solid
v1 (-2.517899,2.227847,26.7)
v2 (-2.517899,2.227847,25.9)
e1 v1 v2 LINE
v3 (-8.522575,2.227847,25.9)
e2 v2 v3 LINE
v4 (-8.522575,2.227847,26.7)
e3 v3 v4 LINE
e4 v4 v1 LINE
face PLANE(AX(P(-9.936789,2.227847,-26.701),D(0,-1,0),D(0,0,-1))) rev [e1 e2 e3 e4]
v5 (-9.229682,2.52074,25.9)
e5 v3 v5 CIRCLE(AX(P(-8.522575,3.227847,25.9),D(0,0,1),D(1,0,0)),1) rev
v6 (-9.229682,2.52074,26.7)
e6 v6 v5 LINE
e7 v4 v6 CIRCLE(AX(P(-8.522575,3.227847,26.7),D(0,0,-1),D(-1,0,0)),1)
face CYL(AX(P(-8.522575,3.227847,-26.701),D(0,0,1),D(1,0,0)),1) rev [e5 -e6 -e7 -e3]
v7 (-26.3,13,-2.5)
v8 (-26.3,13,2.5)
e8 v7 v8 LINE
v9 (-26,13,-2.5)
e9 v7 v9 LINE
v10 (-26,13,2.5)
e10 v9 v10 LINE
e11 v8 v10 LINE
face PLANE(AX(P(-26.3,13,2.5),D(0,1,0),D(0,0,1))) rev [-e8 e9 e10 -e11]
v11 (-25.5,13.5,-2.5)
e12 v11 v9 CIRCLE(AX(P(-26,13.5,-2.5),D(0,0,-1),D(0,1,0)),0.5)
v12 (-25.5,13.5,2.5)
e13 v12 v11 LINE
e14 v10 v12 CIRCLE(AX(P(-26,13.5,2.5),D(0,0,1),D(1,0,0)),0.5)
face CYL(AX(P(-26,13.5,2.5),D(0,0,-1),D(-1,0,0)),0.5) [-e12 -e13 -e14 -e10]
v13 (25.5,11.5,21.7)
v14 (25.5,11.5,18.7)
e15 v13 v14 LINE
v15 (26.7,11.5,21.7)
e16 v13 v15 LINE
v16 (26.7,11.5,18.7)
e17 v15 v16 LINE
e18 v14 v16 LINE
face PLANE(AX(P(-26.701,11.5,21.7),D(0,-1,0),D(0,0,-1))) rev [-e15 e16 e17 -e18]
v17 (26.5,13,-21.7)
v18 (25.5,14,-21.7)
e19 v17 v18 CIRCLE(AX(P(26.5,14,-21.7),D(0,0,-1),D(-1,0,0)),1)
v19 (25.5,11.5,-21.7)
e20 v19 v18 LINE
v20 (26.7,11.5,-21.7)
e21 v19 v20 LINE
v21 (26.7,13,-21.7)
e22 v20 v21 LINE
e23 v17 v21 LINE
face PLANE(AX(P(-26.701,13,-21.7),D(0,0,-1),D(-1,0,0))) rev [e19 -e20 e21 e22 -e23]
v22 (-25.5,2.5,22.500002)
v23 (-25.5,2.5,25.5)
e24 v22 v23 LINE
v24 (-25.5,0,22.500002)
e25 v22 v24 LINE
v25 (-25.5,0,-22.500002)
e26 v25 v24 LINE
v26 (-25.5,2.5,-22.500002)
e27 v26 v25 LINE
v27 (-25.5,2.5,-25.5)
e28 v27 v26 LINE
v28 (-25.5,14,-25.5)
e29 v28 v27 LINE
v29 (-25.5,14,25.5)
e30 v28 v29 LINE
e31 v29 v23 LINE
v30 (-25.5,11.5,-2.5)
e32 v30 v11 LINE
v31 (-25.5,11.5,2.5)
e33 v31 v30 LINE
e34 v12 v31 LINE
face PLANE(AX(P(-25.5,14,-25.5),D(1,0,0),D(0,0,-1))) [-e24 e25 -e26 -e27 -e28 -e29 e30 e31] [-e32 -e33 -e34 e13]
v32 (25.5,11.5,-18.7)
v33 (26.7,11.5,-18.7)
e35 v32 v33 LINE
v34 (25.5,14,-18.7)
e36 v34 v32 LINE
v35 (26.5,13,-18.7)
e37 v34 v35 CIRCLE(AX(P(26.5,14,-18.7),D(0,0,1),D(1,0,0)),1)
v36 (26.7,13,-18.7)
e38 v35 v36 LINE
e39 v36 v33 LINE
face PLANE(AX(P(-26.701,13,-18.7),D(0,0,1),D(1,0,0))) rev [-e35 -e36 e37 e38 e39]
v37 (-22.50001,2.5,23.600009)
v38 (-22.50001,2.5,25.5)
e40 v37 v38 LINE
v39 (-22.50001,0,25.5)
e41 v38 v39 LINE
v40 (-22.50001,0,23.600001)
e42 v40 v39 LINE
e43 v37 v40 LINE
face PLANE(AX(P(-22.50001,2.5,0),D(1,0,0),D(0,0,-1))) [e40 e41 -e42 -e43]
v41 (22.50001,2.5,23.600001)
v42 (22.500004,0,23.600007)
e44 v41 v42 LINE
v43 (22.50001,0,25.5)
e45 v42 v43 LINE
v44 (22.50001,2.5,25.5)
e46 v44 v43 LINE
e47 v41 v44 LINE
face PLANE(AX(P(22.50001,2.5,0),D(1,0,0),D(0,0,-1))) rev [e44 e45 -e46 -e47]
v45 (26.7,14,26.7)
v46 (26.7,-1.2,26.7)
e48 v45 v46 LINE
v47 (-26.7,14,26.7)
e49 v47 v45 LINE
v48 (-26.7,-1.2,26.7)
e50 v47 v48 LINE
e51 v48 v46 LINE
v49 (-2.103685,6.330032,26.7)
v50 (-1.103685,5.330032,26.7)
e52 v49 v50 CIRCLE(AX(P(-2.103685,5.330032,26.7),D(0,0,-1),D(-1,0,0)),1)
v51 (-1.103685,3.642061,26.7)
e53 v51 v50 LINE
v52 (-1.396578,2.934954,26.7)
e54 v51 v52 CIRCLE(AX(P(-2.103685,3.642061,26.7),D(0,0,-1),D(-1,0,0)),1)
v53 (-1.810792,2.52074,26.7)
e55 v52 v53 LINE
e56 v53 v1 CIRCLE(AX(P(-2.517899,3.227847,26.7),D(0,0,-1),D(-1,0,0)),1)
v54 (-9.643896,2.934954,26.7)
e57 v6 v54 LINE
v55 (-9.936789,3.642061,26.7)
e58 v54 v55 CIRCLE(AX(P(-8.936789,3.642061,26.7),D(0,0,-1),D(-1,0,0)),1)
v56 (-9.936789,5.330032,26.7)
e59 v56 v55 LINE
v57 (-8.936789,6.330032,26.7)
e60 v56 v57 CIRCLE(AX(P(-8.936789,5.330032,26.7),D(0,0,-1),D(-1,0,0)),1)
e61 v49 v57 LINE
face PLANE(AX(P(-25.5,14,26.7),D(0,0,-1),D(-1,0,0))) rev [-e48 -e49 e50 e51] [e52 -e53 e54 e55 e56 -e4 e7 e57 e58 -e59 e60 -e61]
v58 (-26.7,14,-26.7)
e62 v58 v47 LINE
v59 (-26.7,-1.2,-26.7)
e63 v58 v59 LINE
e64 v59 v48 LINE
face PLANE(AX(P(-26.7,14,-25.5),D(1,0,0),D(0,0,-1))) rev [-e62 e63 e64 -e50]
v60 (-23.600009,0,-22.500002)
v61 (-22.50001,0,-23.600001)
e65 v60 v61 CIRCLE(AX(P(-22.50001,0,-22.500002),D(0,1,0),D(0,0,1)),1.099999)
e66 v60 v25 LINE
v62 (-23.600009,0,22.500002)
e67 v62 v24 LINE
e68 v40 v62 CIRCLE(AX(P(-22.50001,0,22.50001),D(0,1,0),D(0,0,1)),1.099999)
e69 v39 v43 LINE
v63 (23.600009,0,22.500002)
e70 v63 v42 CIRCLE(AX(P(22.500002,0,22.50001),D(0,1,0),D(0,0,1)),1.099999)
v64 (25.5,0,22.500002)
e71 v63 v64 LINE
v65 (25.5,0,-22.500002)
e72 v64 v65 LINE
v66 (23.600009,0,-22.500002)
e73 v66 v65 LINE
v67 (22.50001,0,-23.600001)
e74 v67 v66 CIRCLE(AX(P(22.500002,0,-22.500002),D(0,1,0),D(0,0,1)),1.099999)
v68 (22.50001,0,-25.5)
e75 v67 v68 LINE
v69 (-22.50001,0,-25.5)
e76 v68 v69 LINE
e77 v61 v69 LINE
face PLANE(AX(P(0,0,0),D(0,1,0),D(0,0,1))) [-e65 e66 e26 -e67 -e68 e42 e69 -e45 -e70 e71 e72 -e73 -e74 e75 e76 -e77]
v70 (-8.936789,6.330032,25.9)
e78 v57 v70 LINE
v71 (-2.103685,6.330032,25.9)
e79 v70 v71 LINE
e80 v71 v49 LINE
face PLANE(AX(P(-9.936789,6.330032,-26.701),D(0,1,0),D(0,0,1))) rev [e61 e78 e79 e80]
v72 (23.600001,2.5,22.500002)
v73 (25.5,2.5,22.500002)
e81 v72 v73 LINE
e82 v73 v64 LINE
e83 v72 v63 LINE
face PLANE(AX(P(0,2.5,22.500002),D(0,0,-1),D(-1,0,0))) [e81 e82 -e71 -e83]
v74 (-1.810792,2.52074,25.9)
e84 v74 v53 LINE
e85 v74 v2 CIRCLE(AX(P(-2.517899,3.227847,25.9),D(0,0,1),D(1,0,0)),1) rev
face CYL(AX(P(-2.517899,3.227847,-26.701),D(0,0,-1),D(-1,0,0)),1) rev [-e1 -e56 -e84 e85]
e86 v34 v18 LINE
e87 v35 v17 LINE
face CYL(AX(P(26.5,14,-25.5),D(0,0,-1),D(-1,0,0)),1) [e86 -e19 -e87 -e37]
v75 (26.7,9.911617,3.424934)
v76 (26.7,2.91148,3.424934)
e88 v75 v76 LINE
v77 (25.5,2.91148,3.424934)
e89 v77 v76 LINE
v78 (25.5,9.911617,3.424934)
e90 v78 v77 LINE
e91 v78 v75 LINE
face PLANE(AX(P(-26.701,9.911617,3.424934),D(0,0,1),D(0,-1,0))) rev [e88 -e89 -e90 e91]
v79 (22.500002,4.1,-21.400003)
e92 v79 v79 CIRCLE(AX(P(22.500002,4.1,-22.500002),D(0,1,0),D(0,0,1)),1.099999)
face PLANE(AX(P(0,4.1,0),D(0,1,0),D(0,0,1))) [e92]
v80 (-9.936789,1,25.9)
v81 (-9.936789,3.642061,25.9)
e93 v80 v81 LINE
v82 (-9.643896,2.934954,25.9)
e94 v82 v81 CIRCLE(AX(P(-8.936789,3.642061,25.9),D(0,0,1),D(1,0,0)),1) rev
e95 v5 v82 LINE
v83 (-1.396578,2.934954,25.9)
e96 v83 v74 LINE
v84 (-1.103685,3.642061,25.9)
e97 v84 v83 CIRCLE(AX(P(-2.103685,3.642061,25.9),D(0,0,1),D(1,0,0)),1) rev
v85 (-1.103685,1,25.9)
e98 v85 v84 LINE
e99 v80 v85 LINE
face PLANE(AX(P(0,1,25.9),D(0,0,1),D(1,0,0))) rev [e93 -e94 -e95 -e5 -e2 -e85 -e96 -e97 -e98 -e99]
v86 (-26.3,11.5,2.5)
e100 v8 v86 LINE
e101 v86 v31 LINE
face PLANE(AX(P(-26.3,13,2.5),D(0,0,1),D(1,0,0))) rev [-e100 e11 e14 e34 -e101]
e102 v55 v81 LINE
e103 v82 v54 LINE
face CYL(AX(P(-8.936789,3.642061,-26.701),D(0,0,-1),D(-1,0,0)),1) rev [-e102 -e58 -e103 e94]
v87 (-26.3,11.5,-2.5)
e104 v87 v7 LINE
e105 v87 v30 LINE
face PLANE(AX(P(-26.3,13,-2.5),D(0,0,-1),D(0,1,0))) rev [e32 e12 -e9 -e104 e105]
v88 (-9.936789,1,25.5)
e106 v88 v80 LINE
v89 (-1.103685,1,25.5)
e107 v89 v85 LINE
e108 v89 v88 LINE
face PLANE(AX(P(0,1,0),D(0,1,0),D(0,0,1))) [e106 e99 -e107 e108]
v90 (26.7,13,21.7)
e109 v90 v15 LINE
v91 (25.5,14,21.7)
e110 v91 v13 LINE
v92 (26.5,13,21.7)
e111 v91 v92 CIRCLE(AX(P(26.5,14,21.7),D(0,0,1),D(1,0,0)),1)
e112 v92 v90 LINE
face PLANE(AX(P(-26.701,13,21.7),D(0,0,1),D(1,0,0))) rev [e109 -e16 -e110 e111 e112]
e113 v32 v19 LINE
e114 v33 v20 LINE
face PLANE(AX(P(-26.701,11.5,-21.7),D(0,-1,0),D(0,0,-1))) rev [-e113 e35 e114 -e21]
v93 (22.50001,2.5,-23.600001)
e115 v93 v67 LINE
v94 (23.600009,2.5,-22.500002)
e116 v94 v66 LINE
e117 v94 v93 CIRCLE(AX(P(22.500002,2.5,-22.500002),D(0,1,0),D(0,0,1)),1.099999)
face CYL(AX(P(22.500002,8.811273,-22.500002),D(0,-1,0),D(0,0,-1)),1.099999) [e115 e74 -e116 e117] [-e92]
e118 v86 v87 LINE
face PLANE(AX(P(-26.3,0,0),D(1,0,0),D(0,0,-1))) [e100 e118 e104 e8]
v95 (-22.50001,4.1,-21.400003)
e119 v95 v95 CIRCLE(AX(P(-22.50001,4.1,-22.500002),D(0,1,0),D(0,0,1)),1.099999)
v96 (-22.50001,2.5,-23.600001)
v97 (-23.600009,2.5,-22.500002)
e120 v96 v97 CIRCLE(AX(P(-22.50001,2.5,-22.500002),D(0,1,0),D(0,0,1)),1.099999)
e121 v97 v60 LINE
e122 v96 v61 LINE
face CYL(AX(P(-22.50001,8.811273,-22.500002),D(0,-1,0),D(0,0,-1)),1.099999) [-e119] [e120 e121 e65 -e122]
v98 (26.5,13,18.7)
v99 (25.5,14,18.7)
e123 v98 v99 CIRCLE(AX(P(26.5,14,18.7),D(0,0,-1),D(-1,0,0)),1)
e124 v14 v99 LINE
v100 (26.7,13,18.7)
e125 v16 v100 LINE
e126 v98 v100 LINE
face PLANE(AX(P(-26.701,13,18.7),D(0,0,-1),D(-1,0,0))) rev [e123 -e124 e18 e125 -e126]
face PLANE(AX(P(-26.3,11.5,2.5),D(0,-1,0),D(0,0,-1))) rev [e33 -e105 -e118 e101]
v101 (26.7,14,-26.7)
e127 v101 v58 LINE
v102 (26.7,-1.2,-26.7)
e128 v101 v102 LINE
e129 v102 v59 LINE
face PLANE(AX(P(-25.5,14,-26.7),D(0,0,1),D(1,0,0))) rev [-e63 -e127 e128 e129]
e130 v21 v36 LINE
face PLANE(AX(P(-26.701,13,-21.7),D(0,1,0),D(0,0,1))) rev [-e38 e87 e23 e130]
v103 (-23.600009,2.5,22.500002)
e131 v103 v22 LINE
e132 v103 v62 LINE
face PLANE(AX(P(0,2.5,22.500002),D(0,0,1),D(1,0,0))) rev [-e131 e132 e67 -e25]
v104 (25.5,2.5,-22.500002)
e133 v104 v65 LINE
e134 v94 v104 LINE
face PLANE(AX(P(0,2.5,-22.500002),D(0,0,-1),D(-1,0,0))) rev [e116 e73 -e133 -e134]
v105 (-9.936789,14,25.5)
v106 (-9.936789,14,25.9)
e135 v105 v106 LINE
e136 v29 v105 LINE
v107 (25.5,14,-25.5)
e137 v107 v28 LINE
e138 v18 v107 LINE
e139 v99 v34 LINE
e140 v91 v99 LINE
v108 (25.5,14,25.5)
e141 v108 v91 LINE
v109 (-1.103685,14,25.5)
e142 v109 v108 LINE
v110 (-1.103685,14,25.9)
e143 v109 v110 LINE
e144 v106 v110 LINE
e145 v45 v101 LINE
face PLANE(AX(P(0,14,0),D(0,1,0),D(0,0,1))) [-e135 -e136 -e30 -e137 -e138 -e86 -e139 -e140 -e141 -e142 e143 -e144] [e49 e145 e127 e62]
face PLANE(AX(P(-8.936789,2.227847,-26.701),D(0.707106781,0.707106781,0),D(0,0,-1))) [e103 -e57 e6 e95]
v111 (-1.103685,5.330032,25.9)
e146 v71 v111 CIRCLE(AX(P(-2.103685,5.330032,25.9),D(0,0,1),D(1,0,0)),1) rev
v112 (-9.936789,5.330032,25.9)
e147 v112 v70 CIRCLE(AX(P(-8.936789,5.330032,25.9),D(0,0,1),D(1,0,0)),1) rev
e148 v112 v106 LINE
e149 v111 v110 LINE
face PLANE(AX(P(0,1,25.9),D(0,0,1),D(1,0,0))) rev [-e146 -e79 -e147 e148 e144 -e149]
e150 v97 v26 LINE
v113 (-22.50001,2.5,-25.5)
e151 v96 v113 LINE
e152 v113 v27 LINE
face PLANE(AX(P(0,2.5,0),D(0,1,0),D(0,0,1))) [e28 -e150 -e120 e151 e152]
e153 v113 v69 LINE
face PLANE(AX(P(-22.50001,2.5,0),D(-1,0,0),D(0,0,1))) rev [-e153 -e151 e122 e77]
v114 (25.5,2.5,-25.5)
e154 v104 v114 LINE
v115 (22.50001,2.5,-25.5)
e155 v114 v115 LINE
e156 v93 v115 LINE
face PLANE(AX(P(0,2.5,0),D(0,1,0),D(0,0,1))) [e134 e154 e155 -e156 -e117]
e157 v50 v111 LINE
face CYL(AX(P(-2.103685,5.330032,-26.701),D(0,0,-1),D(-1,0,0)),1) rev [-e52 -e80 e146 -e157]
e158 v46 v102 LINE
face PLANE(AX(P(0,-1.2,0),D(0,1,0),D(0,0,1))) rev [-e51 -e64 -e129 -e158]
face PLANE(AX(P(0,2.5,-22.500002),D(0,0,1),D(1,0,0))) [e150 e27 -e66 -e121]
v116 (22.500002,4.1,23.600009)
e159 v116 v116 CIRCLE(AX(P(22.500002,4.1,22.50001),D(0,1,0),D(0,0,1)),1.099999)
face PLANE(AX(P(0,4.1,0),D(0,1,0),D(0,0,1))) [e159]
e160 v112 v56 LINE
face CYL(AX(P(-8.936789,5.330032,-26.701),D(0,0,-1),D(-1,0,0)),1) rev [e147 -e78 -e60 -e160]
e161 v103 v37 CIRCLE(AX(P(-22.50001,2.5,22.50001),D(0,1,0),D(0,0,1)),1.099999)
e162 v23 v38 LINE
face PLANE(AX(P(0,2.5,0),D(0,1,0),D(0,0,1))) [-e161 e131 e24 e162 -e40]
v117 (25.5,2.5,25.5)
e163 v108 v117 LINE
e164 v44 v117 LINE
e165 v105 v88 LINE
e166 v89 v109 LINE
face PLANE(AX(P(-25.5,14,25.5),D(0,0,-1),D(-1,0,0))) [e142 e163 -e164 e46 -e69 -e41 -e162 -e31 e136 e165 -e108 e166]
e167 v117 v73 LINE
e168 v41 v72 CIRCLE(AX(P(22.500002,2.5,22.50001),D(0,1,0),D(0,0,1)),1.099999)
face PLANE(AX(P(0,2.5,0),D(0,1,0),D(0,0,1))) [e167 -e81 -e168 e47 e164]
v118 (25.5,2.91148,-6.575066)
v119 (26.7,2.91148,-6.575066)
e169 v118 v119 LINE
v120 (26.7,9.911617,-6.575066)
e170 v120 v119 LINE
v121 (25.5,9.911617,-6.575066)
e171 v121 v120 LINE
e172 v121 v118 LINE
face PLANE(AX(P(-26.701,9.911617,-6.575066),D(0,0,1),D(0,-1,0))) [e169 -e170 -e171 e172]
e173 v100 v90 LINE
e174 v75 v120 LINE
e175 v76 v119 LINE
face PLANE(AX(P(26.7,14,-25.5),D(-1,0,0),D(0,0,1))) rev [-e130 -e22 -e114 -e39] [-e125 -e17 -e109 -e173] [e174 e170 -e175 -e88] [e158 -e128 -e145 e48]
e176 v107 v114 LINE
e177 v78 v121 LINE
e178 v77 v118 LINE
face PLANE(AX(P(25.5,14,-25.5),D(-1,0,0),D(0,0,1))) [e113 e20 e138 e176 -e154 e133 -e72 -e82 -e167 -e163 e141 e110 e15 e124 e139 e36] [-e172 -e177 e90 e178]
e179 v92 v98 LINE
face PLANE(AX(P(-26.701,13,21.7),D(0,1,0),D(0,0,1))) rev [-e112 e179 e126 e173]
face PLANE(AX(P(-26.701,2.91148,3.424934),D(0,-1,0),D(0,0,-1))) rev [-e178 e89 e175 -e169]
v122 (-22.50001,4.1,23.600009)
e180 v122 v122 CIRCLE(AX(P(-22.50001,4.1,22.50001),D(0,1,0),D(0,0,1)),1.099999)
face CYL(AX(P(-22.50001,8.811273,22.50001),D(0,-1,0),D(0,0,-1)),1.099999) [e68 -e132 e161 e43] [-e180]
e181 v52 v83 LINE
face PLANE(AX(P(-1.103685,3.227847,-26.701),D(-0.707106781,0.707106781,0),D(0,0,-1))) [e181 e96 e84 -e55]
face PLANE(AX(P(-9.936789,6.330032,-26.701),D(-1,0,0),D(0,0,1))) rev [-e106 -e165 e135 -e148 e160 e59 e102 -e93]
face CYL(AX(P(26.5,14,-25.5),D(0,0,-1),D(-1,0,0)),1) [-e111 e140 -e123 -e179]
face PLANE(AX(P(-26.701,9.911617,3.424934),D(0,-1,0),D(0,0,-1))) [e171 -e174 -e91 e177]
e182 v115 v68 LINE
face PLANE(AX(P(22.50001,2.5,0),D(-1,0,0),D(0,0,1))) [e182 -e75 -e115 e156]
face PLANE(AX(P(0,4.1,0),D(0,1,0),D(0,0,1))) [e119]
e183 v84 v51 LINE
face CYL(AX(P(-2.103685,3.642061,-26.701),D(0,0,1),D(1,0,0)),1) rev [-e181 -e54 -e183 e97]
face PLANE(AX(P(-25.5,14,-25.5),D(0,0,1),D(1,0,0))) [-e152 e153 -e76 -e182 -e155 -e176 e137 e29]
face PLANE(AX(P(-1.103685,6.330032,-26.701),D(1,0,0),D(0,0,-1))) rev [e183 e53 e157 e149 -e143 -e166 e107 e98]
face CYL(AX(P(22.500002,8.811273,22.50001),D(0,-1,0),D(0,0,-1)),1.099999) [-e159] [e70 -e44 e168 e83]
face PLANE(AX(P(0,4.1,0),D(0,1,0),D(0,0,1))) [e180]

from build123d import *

# Parameters (mm, degrees)
SKETCH1_W           = 51
SKETCH1_H           = 51
BOSS_EXTRUDE1_DEPTH = 14
SHELL1_T            = 1.2
CUT_EXTRUDE1_REACH  = 63.323
SKETCH3_W           = 8.833103678
SKETCH3_H           = 4.102185467
FILLET1_R           = 1
CHAMFER1_SIZE       = 1
FILLET2_R           = 1
BOSS_EXTRUDE2_DEPTH = 2.5
SKETCH4_3_R         = 1.09999934
BOSS_EXTRUDE3_DEPTH = 4.1
CUT_EXTRUDE3_REACH  = 63.323
SKETCH8_W           = 3
SKETCH8_H           = 1.5
FILLET3_R           = 1
SKETCH9_W           = 5
SKETCH9_H           = 1.5
CUT_EXTRUDE4_DEPTH  = 0.8
FILLET4_R           = 0.5
CUT_EXTRUDE5_REACH  = 63.323
SKETCH10_W          = 10
SKETCH10_H          = 7.000137798
SKETCH14_W          = 8.833103678
SKETCH14_H          = 0.4
CUT_EXTRUDE6_DEPTH  = 13


# Read off the part's stored shape, not the designer's step: Boss-Extrude2
with BuildPart() as part:
    # Sketch1 → Boss-Extrude1 (new body)
    with BuildSketch(Plane(origin=(0, 0, 0), x_dir=(1, 0, 0), z_dir=(0, 1, 0))):
        Rectangle(SKETCH1_W, SKETCH1_H)
    extrude(amount=BOSS_EXTRUDE1_DEPTH)

    # Shell1
    shell1_openings = [part.faces().sort_by_distance(p)[0] for p in [
        (0, 14, 0),
    ]]
    offset(amount=SHELL1_T, openings=shell1_openings, kind=Kind.INTERSECTION)

    # Sketch3 → Cut-Extrude1 (cut, up to next)
    with BuildSketch(Plane.XY.offset(26.7), mode=Mode.PRIVATE) as cut_extrude1_sk1:
        with Locations((-5.520237079, 4.278939715)):
            Rectangle(SKETCH3_W, SKETCH3_H)
    cut_extrude1_tool1 = extrude(cut_extrude1_sk1.sketch, amount=-CUT_EXTRUDE1_REACH, mode=Mode.PRIVATE) & part.part
    add(cut_extrude1_tool1.solids().sort_by_distance((-5.520237, 4.27894, 26.7))[0], mode=Mode.SUBTRACT)

    # Fillet1
    fillet1_edges = [part.edges().sort_by_distance(p)[0] for p in [
        (-1.10368524, 6.330032448, 26.1),
        (-9.936788918, 6.330032448, 26.1),
    ]]
    fillet(fillet1_edges, radius=FILLET1_R)

    # Chamfer1
    chamfer1_edges = [part.edges().sort_by_distance(p)[0] for p in [
        (-1.10368524, 2.227846981, 26.1),
        (-9.936788918, 2.227846981, 26.1),
    ]]
    chamfer(chamfer1_edges, length=CHAMFER1_SIZE)

    # Fillet2
    fillet2_edges = [part.edges().sort_by_distance(p)[0] for p in [
        (-1.10368524, 3.227846981, 26.1),
        (-8.936788918, 2.227846981, 26.1),
        (-2.10368524, 2.227846981, 26.1),
        (-9.936788918, 3.227846981, 26.1),
    ]]
    fillet(fillet2_edges, radius=FILLET2_R)

    # Boss-Extrude2 outline → Boss-Extrude2 (add)
    with BuildSketch(Plane(origin=(0, 0, 0), x_dir=(1, 0, 0), z_dir=(0, 1, 0))):
        with BuildLine():
            Line((25.5, 25.5), (22.50000961, 25.5))
            Line((22.50000961, 25.5), (22.50000961, 23.60000133))
            ThreePointArc((22.50000961, 23.60000133), (23.277821677, 23.277816289), (23.60000133, 22.50000199))
            Line((23.60000133, 22.50000199), (25.5, 22.50000199))
            Line((25.5, 22.50000199), (25.5, 25.5))
        make_face()
        with BuildLine():
            Line((-22.50000961, 23.60000133), (-22.50000961, 25.5))
            Line((-22.50000961, 25.5), (-25.5, 25.5))
            Line((-25.5, 25.5), (-25.5, 22.50000199))
            Line((-25.5, 22.50000199), (-23.60000895, 22.50000199))
            ThreePointArc((-23.60000895, 22.50000199), (-23.277826603, 23.277818983), (-22.50000961, 23.60000133))
        make_face()
        with BuildLine():
            Line((25.5, -25.5), (25.5, -22.50000199))
            Line((25.5, -22.50000199), (23.60000133, -22.50000199))
            ThreePointArc((23.60000133, -22.50000199), (23.277824371, -23.277821214), (22.50000961, -23.60000895))
            Line((22.50000961, -23.60000895), (22.50000961, -25.5))
            Line((22.50000961, -25.5), (25.5, -25.5))
        make_face()
        with BuildLine():
            Line((-23.60000895, -22.50000199), (-25.5, -22.50000199))
            Line((-25.5, -22.50000199), (-25.5, -25.5))
            Line((-25.5, -25.5), (-22.50000961, -25.5))
            Line((-22.50000961, -25.5), (-22.50000961, -23.60000895))
            ThreePointArc((-22.50000961, -23.60000895), (-23.277829297, -23.277823909), (-23.60000895, -22.50000199))
        make_face()
    extrude(amount=BOSS_EXTRUDE2_DEPTH)

    # Sketch4<3> → Boss-Extrude3 (add)
    with BuildSketch(Plane(origin=(0, 0, 0), x_dir=(1, 0, 0), z_dir=(0, 1, 0))):
        with Locations(Location((-22.50000961, 22.50000199, 0), (0, 0, 90))):
            Circle(SKETCH4_3_R)
        with Locations(Location((22.50000199, 22.50000199, 0), (0, 0, 89.999603096))):
            Circle(SKETCH4_3_R)
        with Locations(Location((22.50000199, -22.50000961, 0), (0, 0, 0.000396902))):
            Circle(SKETCH4_3_R)
        with Locations(Location((-22.50000961, -22.50000961, 0), (0, 0, 270))):
            Circle(SKETCH4_3_R)
    extrude(amount=BOSS_EXTRUDE3_DEPTH)

    # Sketch8 → Cut-Extrude3 (cut, up to next)
    with BuildSketch(Plane(origin=(26.7, 0, 0), x_dir=(0, 0, -1), z_dir=(1, 0, 0)), mode=Mode.PRIVATE) as cut_extrude3_sk1:
        with Locations((-20.2, 12.25)):
            Rectangle(SKETCH8_W, SKETCH8_H)
    cut_extrude3_tool1 = extrude(cut_extrude3_sk1.sketch, amount=-CUT_EXTRUDE3_REACH, mode=Mode.PRIVATE) & part.part
    # Sketch8 → Cut-Extrude3 (cut, up to next)
    with BuildSketch(Plane(origin=(26.7, 0, 0), x_dir=(0, 0, -1), z_dir=(1, 0, 0)), mode=Mode.PRIVATE) as cut_extrude3_sk2:
        with Locations((20.2, 12.25)):
            Rectangle(SKETCH8_W, SKETCH8_H)
    cut_extrude3_tool2 = extrude(cut_extrude3_sk2.sketch, amount=-CUT_EXTRUDE3_REACH, mode=Mode.PRIVATE) & part.part
    add(cut_extrude3_tool1.solids().sort_by_distance((26.7, 12.25, 20.2))[0], mode=Mode.SUBTRACT)
    add(cut_extrude3_tool2.solids().sort_by_distance((26.7, 12.25, -20.2))[0], mode=Mode.SUBTRACT)

    # Fillet3
    fillet3_edges = [part.edges().sort_by_distance(p)[0] for p in [
        (25.5, 13, 20.2),
        (25.5, 13, -20.2),
    ]]
    fillet(fillet3_edges, radius=FILLET3_R - 0.0001)  # a hair under: the kernel refuses the full size

    # Sketch9 → Cut-Extrude4 (cut)
    with BuildSketch(Plane(origin=(-25.5, 0, 0), x_dir=(0, 0, -1), z_dir=(1, 0, 0))):
        with Locations((0, 12.25)):
            Rectangle(SKETCH9_W, SKETCH9_H)
    extrude(amount=-CUT_EXTRUDE4_DEPTH, mode=Mode.SUBTRACT)

    # Fillet4
    fillet4_edges = [part.edges().sort_by_distance(p)[0] for p in [
        (-25.5, 13, 0),
    ]]
    fillet(fillet4_edges, radius=FILLET4_R)

    # Sketch10 → Cut-Extrude5 (cut, up to next)
    with BuildSketch(Plane(origin=(26.7, 0, 0), x_dir=(0, 0, -1), z_dir=(1, 0, 0)), mode=Mode.PRIVATE) as cut_extrude5_sk1:
        with Locations((1.575065653, 6.411548449)):
            Rectangle(SKETCH10_W, SKETCH10_H)
    cut_extrude5_tool1 = extrude(cut_extrude5_sk1.sketch, amount=-CUT_EXTRUDE5_REACH, mode=Mode.PRIVATE) & part.part
    add(cut_extrude5_tool1.solids().sort_by_distance((26.7, 6.411548, -1.575066))[0], mode=Mode.SUBTRACT)

    # Sketch14 → Cut-Extrude6 (cut)
    with BuildSketch(Plane(origin=(0, 14, 0), x_dir=(1, 0, 0), z_dir=(0, 1, 0))):
        with Locations((-5.520237079, -25.7)):
            Rectangle(SKETCH14_W, SKETCH14_H)
    extrude(amount=-CUT_EXTRUDE6_DEPTH, mode=Mode.SUBTRACT)


solid = part.part
